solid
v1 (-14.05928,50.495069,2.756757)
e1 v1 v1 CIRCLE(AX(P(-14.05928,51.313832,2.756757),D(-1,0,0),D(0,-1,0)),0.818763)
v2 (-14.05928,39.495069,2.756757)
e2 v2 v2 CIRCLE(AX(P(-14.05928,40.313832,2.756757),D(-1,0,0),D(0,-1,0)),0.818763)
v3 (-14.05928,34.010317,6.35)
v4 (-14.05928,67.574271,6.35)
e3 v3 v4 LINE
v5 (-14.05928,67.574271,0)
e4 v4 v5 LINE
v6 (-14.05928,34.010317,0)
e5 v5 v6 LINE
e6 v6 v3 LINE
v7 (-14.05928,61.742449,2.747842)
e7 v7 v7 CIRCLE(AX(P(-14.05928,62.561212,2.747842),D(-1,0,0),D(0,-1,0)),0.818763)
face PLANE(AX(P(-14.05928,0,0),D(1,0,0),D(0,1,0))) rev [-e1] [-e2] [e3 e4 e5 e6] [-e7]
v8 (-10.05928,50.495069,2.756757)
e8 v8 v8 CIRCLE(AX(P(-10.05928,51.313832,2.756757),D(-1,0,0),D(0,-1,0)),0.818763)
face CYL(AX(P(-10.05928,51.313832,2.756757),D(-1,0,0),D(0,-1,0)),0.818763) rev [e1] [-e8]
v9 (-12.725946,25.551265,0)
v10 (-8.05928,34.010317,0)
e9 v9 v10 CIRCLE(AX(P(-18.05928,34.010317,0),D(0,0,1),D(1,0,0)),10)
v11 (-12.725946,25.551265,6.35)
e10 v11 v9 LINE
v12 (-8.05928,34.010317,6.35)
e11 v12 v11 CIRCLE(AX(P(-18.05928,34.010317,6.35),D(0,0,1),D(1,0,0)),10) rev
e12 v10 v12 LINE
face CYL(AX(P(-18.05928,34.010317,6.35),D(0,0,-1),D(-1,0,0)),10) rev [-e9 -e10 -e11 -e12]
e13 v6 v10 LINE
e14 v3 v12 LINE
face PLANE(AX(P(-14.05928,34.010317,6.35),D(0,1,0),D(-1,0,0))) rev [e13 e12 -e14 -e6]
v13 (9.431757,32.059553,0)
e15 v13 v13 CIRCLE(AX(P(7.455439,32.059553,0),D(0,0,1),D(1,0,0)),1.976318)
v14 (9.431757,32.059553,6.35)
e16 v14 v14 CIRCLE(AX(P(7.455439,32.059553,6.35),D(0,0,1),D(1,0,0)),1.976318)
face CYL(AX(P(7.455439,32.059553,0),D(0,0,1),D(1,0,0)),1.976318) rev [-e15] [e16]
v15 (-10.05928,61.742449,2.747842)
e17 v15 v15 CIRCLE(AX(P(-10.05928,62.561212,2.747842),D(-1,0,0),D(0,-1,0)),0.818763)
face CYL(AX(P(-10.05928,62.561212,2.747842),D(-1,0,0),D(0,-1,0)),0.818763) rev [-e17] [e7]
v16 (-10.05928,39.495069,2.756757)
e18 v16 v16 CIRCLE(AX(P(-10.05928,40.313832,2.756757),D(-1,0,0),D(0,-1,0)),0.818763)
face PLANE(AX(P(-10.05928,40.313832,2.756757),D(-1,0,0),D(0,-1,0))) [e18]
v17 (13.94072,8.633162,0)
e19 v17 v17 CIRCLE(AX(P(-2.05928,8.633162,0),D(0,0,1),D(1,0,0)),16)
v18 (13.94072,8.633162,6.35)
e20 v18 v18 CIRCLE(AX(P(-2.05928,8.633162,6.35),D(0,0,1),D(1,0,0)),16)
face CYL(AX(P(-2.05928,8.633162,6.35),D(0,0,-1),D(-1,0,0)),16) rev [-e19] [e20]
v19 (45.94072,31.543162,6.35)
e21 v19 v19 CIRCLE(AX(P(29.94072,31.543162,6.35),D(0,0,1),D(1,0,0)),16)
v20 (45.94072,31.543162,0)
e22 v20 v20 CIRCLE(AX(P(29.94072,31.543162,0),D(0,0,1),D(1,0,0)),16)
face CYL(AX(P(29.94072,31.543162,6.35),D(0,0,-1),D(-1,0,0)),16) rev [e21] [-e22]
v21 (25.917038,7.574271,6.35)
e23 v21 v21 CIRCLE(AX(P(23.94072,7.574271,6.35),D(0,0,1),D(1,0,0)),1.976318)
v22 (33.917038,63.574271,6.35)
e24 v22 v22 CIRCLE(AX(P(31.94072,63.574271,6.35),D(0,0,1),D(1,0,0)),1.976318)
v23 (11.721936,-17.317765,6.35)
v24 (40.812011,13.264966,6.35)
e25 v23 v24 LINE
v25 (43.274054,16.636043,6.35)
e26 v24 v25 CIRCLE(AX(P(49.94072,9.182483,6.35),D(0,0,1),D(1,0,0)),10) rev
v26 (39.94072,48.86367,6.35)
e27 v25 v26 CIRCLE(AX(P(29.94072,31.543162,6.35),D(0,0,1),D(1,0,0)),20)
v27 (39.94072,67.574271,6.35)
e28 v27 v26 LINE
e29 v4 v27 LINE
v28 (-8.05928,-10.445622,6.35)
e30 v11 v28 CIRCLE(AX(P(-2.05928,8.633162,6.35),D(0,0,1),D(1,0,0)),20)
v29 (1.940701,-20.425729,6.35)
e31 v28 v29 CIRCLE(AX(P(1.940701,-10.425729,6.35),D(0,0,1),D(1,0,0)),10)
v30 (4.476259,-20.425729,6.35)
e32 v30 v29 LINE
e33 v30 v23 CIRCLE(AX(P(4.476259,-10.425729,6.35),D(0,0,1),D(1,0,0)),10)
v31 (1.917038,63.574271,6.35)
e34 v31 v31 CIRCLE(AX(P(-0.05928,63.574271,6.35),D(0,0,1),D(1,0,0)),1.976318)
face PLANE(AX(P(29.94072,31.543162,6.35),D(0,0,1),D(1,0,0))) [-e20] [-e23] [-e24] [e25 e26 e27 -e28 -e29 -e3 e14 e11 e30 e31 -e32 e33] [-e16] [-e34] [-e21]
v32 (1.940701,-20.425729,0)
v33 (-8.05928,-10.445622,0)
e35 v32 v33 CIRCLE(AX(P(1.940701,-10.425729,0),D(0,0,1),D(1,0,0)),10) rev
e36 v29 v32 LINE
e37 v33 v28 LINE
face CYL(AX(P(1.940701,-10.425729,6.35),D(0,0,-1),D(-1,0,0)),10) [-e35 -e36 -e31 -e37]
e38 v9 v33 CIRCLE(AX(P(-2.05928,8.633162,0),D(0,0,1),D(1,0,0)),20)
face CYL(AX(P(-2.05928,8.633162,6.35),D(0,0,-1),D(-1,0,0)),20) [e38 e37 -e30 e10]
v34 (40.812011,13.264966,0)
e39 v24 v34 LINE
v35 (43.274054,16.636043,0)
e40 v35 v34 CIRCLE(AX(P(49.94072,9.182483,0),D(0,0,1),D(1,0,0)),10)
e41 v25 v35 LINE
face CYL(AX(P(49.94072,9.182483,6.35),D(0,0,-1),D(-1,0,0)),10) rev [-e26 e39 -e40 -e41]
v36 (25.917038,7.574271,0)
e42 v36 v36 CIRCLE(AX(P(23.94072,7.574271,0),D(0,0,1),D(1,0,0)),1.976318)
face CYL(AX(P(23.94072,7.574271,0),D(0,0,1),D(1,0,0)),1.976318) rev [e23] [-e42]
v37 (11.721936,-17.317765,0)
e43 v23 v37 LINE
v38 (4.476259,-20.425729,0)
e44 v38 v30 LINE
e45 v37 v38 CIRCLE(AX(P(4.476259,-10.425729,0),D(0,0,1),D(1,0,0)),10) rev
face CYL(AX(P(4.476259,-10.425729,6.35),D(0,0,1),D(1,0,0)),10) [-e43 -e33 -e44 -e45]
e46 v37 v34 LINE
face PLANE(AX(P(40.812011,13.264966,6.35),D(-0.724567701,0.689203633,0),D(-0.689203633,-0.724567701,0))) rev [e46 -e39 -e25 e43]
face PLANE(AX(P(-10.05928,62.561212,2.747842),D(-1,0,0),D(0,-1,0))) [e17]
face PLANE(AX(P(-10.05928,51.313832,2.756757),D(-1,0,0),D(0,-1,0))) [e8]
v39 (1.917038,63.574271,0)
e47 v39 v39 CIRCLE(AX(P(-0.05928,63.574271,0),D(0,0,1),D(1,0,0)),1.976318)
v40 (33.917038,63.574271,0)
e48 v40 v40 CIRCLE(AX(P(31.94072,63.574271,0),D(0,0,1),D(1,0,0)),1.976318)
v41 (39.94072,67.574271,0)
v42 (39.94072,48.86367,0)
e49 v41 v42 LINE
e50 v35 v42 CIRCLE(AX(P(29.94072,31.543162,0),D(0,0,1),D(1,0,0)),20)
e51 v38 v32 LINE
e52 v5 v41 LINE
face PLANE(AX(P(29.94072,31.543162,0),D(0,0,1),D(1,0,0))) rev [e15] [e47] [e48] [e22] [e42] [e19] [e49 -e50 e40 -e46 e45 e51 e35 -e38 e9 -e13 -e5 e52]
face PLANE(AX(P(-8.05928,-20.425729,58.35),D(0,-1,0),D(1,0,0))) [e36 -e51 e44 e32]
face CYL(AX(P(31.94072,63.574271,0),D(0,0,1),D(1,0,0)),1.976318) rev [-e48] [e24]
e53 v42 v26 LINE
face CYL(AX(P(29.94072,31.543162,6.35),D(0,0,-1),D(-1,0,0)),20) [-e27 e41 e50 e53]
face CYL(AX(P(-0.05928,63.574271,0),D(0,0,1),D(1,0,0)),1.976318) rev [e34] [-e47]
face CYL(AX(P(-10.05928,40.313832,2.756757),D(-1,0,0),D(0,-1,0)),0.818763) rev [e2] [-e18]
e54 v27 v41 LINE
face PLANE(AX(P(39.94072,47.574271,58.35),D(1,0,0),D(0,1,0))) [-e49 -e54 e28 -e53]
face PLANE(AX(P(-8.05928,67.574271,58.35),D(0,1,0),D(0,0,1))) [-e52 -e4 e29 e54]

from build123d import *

# Parameters (mm, degrees)
SKETCH1_R           = 16
BOSS_EXTRUDE1_DEPTH = 6.35
FILLET1_R           = 10
SKETCH2_W           = 48
SKETCH2_H           = 20
BOSS_EXTRUDE2_DEPTH = 6.35
SKETCH4_W           = 6.35
SKETCH4_H           = 33.563954303
BOSS_EXTRUDE3_DEPTH = 6
SKETCH5_R           = 1.976318005
CUT_EXTRUDE1_DEPTH  = 85.265533897
SKETCH6_R           = 0.818763353
CUT_EXTRUDE2_DEPTH  = 4
CUT_EXTRUDE3_DEPTH  = 85.265533897
FILLET2_R           = 10


with BuildPart() as part:
    # Sketch1 → Boss-Extrude1 (new body)
    with BuildSketch(Plane.XY):
        with BuildLine():
            Line((15.771494463, -0.425728707), (39.940720481, -0.425728707))
            Line((39.940720481, -0.425728707), (39.940720481, 14.222654346))
            ThreePointArc((39.940720481, 14.222654346), (46.645253692, 42.541279088), (17.982311374, 47.574271293))
            Line((17.982311374, 47.574271293), (-8.059279519, 47.574271293))
            Line((-8.059279519, 47.574271293), (-8.059279519, 27.711945938))
            ThreePointArc((-8.059279519, 27.711945938), (-17.321126946, -4.292626776), (15.771494463, -0.425728707))
        make_face()
        with Locations((-2.059279519, 8.63316191)):
            Circle(SKETCH1_R, mode=Mode.SUBTRACT)
        with Locations((29.940720481, 31.543162422)):
            Circle(SKETCH1_R, mode=Mode.SUBTRACT)
    extrude(amount=BOSS_EXTRUDE1_DEPTH)

    # Fillet1
    fillet1_edges = [part.edges().sort_by_distance(p)[0] for p in [
        (17.982311374, 47.574271293, 3.175),
        (39.940720481, 14.222654346, 3.175),
        (15.771494463, -0.425728707, 3.175),
        (-8.059279519, 27.711945938, 3.175),
    ]]
    fillet(fillet1_edges, radius=FILLET1_R)

    # Sketch2 → Boss-Extrude2 (add)
    with BuildSketch(Plane(origin=(0, 0, 0), x_dir=(-1, 0, 0), z_dir=(0, 0, -1))):
        with Locations((-15.940720481, 57.574271293)):
            Rectangle(SKETCH2_W, SKETCH2_H)
        with BuildLine():
            Line((-39.940720481, -0.425728707), (-39.940720481, -20.425728707))
            Line((-39.940720481, -20.425728707), (8.059279519, -20.425728707))
            Line((8.059279519, -20.425728707), (8.059279519, -6.199235065))
            ThreePointArc((8.059279519, -6.199235065), (-2.550706673, -6.68832716), (-11.129219288, -0.425728707))
            Line((-11.129219288, -0.425728707), (-39.940720481, -0.425728707))
        make_face()
    extrude(amount=-BOSS_EXTRUDE2_DEPTH)

    # Sketch4 → Boss-Extrude3 (add)
    with BuildSketch(Plane.ZY.offset(8.059279519)):
        with Locations((3.175, 50.792294142)):
            Rectangle(SKETCH4_W, SKETCH4_H)
    extrude(amount=BOSS_EXTRUDE3_DEPTH)

    # Sketch5 → Cut-Extrude1 (cut, through all)
    with BuildSketch(Plane.XY.offset(6.35)):
        with Locations((31.940720481, 63.574271293)):
            Circle(SKETCH5_R)
        with Locations((-0.059279519, 63.574271293)):
            Circle(SKETCH5_R)
        with Locations((23.940720481, 7.574271293)):
            Circle(SKETCH5_R)
        with Locations((7.455439106, 32.059552667)):
            Circle(SKETCH5_R)
    extrude(amount=-CUT_EXTRUDE1_DEPTH, mode=Mode.SUBTRACT)

    # Sketch6 → Cut-Extrude2 (cut)
    with BuildSketch(Plane.ZY.offset(14.059279519)):
        with Locations(Location((2.747841942, 62.56121214, 0), (0, 0, 270))):
            Circle(SKETCH6_R)
        with Locations(Location((2.756756589, 51.313832117, 0), (0, 0, 270))):
            Circle(SKETCH6_R)
        with Locations(Location((2.756756589, 40.313832117, 0), (0, 0, 270))):
            Circle(SKETCH6_R)
    extrude(amount=-CUT_EXTRUDE2_DEPTH, mode=Mode.SUBTRACT)

    # Sketch7 → Cut-Extrude3 (cut, through all)
    with BuildSketch(Plane(origin=(0, 0, 0), x_dir=(-1, 0, 0), z_dir=(0, 0, -1))):
        Polygon((-40.812011189, 13.264965551), (-6.140614995, -23.185471789), (-44.163616568, -23.185471789), (-44.163616568, 13.264965551), align=None)
    extrude(amount=-CUT_EXTRUDE3_DEPTH, mode=Mode.SUBTRACT)

    # Fillet2
    # the kernel refuses this fillet: 10 mm, written as the material it takes off along each edge
    with BuildSketch(Plane(origin=(-8.059279519, -20.425728707, -25), x_dir=(1, 0, 0), z_dir=(0, 0, 1))) as fillet2_piece_1_section:
        with BuildLine():
            CenterArc((FILLET2_R, FILLET2_R), FILLET2_R, 180, 90)
            Line((0, FILLET2_R), (0, 0))
            Line((0, 0), (FILLET2_R, 0))
        make_face()
    fillet2_piece_1 = extrude(amount=56.35, mode=Mode.PRIVATE)
    fillet2_piece_1 = fillet2_piece_1 - Plane(origin=(-2.059279519, 8.63316191, 3.175), x_dir=(-0.30000000000000054, 0.9539392014169455, 0), z_dir=(0, 0, -1)) * Cylinder(20, 153, mode=Mode.PRIVATE)
    add(fillet2_piece_1, mode=Mode.SUBTRACT)
    with BuildSketch(Plane(origin=(8.765662944, -20.425728707, -10.72351028), x_dir=(0.6892036325040336, 0.7245677007314395, 0), z_dir=(0, 0, 1))) as fillet2_piece_2:
        with BuildLine():
            CenterArc((FILLET2_R * 0.428940411203, FILLET2_R), FILLET2_R, 223.567102496, 46.432897504)
            Line((-FILLET2_R * 0.295627289529, FILLET2_R * 0.310796367496), (0, 0))
            Line((0, 0), (FILLET2_R * 0.428940411203, 0))
        make_face()
    extrude(amount=27.79702056, mode=Mode.SUBTRACT)


solid = part.part
